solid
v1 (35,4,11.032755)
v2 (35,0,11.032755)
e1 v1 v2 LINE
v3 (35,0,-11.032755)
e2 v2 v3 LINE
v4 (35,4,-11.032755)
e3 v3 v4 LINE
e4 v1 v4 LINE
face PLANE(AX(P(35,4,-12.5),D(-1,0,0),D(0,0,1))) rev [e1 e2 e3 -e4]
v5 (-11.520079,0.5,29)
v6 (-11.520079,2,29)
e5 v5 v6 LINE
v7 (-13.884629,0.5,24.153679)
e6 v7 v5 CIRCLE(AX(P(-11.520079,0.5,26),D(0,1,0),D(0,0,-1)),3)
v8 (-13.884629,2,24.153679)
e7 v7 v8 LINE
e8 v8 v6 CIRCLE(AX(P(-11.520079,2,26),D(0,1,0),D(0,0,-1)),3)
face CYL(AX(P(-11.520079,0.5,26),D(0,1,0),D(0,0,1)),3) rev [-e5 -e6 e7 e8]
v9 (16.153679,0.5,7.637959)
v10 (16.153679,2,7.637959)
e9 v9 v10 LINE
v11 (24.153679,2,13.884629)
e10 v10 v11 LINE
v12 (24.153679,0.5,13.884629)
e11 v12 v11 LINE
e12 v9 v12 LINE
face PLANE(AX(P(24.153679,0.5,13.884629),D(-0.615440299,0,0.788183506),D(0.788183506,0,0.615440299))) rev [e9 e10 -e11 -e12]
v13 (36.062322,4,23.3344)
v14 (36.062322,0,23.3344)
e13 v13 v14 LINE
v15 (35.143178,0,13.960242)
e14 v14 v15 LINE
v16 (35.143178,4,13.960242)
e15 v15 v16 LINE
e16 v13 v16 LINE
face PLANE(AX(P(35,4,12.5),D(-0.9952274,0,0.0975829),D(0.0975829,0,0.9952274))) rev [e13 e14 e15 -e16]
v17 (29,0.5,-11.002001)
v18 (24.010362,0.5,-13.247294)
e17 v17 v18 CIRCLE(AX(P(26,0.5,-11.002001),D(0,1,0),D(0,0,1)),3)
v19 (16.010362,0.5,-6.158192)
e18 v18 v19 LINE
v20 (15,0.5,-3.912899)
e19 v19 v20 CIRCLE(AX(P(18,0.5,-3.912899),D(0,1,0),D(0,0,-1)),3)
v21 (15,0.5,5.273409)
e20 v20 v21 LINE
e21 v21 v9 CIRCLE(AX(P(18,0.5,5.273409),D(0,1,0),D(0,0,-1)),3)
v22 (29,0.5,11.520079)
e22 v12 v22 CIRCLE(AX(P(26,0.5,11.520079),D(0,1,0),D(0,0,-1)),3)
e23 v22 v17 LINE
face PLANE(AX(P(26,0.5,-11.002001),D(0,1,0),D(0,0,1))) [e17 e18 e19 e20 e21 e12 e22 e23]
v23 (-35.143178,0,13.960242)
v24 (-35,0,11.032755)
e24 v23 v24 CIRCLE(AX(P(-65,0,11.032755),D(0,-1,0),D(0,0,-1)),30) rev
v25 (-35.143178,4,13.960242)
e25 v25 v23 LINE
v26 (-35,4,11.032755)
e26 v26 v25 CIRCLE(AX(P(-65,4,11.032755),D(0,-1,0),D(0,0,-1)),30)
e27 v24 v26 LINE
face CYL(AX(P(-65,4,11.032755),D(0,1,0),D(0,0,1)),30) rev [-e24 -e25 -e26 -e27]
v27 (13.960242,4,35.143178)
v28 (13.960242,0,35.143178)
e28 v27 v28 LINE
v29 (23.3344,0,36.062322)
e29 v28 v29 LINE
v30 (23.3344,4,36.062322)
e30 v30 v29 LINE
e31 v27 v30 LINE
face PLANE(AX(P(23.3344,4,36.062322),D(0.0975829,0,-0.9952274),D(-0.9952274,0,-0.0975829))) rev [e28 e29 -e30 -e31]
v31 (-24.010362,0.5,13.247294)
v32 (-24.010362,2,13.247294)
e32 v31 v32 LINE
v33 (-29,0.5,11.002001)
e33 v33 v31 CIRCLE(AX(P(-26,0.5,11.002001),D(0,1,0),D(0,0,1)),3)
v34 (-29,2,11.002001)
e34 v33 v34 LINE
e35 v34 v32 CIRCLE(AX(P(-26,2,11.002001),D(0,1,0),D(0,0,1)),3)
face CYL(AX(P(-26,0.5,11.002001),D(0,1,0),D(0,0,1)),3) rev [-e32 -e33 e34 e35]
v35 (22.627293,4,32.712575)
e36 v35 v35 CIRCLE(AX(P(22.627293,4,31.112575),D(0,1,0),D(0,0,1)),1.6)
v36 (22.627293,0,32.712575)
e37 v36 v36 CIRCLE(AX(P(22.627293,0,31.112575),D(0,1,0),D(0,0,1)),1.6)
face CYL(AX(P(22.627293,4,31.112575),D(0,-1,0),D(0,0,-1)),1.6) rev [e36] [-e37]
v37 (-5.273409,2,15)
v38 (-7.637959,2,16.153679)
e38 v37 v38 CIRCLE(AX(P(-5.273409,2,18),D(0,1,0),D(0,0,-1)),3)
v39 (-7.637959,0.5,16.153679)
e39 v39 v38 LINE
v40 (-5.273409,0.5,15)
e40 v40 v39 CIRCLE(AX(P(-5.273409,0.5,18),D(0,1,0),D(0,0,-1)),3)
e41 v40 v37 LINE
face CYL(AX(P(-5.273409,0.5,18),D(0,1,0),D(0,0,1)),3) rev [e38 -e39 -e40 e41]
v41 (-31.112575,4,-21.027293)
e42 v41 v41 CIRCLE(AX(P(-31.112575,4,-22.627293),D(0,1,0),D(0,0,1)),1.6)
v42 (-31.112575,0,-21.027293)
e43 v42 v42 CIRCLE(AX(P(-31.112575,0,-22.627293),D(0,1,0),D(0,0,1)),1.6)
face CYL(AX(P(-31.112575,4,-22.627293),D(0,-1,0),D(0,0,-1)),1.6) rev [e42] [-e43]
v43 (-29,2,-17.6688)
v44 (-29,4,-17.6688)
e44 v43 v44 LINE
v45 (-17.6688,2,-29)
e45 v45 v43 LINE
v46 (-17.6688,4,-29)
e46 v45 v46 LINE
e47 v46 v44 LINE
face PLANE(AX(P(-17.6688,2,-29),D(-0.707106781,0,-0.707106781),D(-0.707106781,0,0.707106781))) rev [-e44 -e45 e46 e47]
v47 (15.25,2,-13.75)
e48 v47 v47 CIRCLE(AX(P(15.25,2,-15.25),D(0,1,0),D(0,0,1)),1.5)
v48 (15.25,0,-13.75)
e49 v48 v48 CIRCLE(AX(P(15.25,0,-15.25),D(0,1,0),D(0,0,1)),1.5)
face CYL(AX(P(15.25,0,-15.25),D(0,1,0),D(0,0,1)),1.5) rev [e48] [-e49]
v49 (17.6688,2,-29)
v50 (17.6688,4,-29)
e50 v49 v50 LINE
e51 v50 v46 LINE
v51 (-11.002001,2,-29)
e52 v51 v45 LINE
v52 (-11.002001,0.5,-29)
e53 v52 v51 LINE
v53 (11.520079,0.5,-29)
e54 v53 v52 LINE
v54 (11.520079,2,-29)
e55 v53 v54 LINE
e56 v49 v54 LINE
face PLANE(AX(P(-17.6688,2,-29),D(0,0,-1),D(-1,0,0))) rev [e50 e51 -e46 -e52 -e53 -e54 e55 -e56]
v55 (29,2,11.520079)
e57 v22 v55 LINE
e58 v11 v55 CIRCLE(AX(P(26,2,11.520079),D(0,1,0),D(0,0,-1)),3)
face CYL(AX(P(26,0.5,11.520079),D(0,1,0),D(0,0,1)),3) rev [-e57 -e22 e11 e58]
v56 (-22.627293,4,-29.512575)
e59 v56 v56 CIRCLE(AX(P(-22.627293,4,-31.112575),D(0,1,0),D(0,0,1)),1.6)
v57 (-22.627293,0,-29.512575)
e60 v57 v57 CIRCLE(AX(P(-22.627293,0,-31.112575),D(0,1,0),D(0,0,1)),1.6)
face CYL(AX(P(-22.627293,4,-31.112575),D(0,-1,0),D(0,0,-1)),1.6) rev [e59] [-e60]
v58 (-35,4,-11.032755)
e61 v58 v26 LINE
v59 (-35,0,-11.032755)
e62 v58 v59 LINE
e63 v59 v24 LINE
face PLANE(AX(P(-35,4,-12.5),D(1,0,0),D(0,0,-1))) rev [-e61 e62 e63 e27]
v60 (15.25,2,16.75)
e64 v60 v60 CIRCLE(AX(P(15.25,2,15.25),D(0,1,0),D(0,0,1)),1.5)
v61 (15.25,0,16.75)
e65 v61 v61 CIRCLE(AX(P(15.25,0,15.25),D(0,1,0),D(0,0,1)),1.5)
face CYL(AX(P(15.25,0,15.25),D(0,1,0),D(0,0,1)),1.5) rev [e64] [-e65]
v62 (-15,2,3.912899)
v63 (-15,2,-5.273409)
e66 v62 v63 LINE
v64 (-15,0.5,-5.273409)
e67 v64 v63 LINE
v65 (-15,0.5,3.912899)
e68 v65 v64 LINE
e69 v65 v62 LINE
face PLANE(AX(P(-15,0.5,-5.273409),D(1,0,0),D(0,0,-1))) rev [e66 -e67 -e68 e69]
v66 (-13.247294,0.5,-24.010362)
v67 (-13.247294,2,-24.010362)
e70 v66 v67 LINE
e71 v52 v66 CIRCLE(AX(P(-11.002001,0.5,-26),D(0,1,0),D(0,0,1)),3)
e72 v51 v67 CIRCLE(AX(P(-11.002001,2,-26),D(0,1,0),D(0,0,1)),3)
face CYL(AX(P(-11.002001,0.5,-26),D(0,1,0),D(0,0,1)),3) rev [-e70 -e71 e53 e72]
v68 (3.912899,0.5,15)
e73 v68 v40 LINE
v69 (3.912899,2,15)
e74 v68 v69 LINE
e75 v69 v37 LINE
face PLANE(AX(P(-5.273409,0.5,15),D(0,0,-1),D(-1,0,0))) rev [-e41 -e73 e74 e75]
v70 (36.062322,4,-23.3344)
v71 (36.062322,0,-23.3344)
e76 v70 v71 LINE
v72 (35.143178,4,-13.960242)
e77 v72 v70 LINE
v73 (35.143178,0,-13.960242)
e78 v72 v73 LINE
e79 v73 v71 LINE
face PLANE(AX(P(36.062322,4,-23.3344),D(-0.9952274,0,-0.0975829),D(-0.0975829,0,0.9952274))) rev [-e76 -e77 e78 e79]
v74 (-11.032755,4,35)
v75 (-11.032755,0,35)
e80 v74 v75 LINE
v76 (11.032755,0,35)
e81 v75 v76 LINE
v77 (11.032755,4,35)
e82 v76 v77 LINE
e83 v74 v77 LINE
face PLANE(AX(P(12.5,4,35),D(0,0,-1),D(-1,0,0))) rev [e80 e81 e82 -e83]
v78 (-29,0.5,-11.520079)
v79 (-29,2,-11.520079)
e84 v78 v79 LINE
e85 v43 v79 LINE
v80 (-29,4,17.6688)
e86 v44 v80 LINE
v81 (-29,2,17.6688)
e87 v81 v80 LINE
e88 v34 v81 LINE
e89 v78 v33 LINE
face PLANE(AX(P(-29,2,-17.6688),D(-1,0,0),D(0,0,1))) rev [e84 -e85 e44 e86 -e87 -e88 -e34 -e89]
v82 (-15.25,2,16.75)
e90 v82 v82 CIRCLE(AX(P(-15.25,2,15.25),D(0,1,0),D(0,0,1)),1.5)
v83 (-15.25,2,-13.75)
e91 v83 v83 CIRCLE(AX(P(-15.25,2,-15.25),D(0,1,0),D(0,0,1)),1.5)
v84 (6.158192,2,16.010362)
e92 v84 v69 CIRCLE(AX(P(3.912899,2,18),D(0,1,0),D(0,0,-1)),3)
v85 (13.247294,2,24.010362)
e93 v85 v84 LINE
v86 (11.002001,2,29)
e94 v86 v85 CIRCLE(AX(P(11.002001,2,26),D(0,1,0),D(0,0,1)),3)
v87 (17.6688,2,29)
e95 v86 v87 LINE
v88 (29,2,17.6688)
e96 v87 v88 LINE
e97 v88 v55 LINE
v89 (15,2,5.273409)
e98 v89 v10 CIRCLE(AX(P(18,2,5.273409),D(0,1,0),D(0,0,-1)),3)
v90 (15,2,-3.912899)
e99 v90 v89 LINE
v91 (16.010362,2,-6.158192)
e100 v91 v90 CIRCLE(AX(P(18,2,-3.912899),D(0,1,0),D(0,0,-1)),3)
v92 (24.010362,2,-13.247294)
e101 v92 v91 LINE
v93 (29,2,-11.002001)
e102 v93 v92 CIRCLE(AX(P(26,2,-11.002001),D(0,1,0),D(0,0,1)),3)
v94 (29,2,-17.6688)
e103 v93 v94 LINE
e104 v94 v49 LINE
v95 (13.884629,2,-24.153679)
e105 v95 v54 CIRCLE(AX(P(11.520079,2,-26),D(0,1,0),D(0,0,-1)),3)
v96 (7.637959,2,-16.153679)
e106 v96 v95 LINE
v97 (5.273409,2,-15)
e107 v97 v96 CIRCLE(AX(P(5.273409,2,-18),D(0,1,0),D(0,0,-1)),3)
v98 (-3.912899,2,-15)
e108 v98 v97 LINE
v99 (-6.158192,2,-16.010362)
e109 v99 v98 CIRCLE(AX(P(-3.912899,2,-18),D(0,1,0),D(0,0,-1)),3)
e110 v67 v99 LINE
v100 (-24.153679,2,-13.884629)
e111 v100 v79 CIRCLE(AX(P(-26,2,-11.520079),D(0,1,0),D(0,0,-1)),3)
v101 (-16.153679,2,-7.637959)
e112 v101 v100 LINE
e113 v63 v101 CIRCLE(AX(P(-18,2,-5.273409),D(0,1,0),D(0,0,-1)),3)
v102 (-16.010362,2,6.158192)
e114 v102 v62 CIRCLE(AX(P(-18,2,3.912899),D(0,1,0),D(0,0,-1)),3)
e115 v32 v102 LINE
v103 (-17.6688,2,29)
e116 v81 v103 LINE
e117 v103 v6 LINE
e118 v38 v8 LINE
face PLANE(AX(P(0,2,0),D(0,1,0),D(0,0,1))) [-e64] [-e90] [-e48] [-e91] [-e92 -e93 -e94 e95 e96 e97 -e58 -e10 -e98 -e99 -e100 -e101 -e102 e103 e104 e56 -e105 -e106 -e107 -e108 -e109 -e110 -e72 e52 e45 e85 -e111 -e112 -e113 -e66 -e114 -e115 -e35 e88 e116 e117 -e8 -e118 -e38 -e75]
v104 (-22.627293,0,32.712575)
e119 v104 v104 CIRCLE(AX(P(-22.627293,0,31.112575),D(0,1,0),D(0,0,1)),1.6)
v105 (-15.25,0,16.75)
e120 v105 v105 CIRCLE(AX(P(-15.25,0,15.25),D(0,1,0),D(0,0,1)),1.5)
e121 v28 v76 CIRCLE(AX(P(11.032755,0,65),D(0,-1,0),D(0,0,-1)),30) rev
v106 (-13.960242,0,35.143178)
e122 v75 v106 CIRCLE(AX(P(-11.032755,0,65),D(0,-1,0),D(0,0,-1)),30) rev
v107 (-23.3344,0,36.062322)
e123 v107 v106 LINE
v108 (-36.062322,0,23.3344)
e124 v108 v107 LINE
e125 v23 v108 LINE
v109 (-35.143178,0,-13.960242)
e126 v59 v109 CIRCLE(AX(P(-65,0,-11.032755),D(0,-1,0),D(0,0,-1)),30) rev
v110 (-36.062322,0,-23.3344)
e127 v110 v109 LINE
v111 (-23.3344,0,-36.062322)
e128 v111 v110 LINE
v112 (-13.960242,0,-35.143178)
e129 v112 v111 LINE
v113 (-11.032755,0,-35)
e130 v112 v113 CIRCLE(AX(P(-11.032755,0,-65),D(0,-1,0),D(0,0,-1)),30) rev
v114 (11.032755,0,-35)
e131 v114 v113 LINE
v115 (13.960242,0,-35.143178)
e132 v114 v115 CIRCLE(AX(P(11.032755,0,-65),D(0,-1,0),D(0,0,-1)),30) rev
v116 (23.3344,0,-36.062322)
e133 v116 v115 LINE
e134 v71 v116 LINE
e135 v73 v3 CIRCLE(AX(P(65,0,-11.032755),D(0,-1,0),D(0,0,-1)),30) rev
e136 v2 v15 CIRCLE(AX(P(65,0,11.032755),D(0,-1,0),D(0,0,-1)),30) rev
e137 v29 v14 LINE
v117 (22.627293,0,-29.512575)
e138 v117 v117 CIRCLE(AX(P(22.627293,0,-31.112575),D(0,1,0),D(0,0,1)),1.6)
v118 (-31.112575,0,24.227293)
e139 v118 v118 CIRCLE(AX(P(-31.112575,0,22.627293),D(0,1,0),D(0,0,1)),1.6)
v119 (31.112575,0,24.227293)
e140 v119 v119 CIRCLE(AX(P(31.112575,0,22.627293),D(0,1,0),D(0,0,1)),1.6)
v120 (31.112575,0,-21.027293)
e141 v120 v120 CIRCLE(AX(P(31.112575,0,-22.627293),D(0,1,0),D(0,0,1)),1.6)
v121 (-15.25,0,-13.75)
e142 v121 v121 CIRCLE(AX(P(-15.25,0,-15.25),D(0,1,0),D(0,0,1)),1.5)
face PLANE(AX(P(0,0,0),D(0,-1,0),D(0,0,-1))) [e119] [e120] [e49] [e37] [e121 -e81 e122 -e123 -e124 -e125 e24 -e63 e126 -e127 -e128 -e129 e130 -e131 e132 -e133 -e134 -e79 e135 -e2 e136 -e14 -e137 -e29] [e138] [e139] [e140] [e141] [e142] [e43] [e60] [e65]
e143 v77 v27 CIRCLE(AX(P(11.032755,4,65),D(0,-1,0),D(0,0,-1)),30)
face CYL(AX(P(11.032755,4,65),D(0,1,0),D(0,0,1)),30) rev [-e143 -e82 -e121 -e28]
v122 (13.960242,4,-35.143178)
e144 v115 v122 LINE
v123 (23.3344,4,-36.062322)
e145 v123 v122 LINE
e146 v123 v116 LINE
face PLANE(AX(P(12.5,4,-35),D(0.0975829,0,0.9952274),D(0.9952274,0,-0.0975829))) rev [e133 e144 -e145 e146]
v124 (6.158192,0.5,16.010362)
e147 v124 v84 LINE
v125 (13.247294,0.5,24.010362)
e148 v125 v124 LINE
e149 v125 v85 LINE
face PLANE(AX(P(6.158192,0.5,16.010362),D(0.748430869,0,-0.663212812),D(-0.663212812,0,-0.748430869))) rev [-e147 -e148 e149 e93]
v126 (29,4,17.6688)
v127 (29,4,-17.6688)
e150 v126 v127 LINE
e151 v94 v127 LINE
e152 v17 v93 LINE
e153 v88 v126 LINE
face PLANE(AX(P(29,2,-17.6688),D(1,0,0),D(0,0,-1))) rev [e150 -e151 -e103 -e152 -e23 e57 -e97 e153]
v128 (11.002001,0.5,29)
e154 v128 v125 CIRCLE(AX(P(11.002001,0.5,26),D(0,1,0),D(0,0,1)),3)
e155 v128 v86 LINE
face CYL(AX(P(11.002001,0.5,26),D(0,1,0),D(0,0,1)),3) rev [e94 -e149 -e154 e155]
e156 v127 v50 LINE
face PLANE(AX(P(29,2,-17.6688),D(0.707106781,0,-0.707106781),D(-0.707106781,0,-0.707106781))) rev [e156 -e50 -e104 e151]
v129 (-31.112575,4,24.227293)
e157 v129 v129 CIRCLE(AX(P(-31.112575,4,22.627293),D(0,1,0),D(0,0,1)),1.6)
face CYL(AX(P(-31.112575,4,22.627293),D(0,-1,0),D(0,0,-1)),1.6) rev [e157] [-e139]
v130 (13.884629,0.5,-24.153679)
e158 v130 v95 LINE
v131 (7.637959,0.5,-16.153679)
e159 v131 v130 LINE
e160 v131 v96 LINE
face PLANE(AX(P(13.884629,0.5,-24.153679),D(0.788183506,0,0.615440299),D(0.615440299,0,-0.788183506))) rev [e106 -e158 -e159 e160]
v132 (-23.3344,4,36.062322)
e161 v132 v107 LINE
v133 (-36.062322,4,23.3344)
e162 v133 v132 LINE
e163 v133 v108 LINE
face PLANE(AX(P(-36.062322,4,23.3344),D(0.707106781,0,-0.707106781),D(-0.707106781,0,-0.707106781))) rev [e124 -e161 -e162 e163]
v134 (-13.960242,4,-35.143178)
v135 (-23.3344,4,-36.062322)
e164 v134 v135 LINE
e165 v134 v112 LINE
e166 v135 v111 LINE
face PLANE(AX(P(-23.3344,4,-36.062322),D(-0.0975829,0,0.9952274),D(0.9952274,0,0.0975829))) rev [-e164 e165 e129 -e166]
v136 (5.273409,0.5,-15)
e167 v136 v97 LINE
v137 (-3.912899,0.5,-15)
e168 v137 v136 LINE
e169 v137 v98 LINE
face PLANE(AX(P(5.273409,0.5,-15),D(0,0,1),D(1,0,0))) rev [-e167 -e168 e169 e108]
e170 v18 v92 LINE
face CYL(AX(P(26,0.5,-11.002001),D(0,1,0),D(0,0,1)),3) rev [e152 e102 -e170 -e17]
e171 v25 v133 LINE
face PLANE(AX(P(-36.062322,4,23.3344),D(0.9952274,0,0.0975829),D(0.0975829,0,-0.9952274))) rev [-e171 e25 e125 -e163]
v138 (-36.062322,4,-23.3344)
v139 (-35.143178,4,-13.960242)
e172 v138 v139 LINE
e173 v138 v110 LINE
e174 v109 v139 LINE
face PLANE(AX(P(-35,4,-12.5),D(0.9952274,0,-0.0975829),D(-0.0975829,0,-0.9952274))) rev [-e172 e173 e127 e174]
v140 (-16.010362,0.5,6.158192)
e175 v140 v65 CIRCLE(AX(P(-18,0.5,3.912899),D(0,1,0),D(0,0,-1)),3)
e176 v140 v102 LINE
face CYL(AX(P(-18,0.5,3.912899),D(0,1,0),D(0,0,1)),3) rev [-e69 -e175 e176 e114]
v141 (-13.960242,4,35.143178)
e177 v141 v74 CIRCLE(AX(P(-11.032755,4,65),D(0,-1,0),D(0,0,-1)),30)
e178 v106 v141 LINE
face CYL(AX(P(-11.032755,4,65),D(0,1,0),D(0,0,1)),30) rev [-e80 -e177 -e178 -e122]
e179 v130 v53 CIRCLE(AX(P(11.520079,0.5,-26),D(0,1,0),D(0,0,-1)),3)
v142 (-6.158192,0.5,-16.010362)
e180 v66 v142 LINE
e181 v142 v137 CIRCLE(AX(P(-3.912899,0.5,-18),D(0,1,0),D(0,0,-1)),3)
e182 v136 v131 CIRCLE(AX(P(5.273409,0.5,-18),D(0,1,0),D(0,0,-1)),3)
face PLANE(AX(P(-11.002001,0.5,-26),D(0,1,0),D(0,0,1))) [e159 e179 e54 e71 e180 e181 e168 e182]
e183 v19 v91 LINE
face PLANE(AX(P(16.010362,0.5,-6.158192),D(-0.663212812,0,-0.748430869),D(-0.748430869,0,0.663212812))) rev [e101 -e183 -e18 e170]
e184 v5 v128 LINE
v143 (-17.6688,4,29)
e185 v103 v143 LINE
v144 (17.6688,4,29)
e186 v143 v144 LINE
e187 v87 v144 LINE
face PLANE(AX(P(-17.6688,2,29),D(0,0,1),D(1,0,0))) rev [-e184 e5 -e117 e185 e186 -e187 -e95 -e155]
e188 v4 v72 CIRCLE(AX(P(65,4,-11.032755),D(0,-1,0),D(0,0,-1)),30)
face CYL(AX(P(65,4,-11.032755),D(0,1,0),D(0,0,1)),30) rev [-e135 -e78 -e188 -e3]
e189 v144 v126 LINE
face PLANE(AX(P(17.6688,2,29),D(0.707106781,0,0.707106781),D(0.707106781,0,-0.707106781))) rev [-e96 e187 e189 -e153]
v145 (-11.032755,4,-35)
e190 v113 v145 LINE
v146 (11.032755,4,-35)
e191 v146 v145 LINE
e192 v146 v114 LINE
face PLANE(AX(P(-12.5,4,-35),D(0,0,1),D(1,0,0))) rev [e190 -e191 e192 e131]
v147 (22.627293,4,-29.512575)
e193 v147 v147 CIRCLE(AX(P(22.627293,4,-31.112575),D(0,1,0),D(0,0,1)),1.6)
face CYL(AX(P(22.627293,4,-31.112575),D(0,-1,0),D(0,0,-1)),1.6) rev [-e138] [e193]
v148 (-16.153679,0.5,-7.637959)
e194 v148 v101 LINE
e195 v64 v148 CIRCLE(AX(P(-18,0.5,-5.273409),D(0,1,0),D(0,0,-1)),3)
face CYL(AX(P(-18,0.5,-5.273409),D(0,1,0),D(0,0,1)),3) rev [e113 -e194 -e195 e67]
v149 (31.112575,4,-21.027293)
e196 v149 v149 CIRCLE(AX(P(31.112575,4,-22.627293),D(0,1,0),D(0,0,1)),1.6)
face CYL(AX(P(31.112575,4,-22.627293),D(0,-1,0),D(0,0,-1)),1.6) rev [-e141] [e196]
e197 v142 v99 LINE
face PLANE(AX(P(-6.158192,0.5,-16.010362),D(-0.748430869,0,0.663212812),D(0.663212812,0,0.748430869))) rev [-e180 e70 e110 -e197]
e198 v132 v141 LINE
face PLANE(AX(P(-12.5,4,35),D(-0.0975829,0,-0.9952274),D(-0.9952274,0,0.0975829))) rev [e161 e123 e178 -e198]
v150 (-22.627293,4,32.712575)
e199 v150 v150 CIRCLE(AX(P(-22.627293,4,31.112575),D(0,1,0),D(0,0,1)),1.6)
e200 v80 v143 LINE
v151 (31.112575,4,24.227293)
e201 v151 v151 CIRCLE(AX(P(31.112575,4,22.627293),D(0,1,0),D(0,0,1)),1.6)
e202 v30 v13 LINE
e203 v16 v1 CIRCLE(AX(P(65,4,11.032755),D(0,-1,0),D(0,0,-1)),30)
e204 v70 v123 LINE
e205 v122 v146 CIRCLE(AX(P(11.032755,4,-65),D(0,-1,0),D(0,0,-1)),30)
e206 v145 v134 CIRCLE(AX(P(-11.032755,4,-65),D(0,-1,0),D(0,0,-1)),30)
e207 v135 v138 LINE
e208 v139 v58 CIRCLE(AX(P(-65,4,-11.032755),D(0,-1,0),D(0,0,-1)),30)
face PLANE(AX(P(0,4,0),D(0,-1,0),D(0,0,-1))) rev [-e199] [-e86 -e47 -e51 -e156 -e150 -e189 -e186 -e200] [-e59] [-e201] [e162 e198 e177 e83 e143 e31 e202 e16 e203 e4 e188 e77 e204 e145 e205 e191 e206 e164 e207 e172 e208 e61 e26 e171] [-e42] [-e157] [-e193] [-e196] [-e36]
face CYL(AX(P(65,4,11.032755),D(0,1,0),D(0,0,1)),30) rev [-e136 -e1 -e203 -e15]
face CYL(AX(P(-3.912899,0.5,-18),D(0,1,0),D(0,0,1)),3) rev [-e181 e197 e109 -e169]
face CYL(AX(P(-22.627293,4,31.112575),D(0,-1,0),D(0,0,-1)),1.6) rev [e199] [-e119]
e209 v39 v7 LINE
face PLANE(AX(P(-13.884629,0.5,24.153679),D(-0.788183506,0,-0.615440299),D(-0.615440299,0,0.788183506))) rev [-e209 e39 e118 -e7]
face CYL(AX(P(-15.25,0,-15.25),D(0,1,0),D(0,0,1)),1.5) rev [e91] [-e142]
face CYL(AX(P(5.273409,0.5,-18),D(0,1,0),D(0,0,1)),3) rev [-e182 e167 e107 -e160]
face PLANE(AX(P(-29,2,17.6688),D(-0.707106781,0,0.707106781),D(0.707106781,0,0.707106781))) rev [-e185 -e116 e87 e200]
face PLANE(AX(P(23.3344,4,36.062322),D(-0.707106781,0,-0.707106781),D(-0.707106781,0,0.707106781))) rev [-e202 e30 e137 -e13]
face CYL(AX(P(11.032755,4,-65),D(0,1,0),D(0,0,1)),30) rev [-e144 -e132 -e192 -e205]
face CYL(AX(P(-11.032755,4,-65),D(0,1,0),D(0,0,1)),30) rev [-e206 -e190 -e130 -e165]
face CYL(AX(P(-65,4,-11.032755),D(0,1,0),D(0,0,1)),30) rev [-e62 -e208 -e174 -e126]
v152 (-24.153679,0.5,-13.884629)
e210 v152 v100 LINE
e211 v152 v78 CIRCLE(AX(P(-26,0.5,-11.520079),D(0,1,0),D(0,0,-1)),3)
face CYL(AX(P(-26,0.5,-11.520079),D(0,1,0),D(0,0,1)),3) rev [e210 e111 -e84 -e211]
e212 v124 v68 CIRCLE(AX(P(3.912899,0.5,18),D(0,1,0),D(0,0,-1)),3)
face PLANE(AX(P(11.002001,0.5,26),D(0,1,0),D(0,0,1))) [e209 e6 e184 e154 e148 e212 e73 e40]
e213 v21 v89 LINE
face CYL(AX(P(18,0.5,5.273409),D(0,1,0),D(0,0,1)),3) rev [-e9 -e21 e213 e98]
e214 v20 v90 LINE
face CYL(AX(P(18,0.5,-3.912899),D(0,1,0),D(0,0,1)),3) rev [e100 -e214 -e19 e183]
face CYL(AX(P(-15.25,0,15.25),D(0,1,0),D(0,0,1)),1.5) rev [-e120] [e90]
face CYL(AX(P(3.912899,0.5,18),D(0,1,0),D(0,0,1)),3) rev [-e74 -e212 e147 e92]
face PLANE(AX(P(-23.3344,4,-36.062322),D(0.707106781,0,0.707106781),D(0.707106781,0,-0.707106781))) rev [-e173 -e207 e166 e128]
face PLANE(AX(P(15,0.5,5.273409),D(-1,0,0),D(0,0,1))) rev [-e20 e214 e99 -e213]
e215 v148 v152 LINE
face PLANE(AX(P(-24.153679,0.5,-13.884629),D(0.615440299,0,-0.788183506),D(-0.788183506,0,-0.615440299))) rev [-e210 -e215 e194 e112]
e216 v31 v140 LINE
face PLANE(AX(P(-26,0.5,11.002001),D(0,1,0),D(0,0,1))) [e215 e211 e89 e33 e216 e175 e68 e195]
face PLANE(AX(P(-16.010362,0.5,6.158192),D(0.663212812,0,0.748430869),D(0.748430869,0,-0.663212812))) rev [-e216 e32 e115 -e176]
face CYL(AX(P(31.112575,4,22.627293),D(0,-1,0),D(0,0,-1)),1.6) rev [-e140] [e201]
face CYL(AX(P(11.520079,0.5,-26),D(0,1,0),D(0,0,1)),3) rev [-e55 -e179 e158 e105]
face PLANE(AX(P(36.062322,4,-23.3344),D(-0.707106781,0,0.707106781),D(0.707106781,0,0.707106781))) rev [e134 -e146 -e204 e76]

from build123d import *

# Parameters (mm, degrees)
SKETCH1_R           = 1.6
BOSS_EXTRUDE1_DEPTH = 4
CUT_EXTRUDE1_DEPTH  = 2
CUT_EXTRUDE2_DEPTH  = 1.5
SKETCH5_R           = 1.5
CUT_EXTRUDE3_DEPTH  = 52.039025935
FILLET1_R           = 30


with BuildPart() as part:
    # Sketch1 → Boss-Extrude1 (new body)
    with BuildSketch(Plane(origin=(0, 0, 0), x_dir=(1, 0, 0), z_dir=(0, 1, 0))):
        Polygon((-35, 12.5), (-36.062322224, 23.334400163), (-23.334400163, 36.062322224), (-12.5, 35), (12.5, 35), (23.334400163, 36.062322224), (36.062322224, 23.334400163), (35, 12.5), (35, -12.5), (36.062322224, -23.334400163), (23.334400163, -36.062322224), (12.5, -35), (-12.5, -35), (-23.334400163, -36.062322224), (-36.062322224, -23.334400163), (-35, -12.5), align=None)
        with Locations(Location((31.112574756, 22.627293382, 0), (0, 0, 270))):
            Circle(SKETCH1_R, mode=Mode.SUBTRACT)
        with Locations(Location((22.627293382, 31.112574756, 0), (0, 0, 270))):
            Circle(SKETCH1_R, mode=Mode.SUBTRACT)
        with Locations(Location((31.112574756, -22.627293382, 0), (0, 0, 270))):
            Circle(SKETCH1_R, mode=Mode.SUBTRACT)
        with Locations(Location((22.627293382, -31.112574756, 0), (0, 0, 270))):
            Circle(SKETCH1_R, mode=Mode.SUBTRACT)
        with Locations(Location((-22.627293382, -31.112574756, 0), (0, 0, 270))):
            Circle(SKETCH1_R, mode=Mode.SUBTRACT)
        with Locations(Location((-31.112574756, -22.627293382, 0), (0, 0, 270))):
            Circle(SKETCH1_R, mode=Mode.SUBTRACT)
        with Locations(Location((-31.112574756, 22.627293382, 0), (0, 0, 270))):
            Circle(SKETCH1_R, mode=Mode.SUBTRACT)
        with Locations(Location((-22.627293382, 31.112574756, 0), (0, 0, 270))):
            Circle(SKETCH1_R, mode=Mode.SUBTRACT)
    extrude(amount=BOSS_EXTRUDE1_DEPTH)

    # Sketch3 → Cut-Extrude1 (cut)
    with BuildSketch(Plane(origin=(0, 4, 0), x_dir=(1, 0, 0), z_dir=(0, 1, 0))):
        Polygon((-17.668800325, 29), (17.668800325, 29), (29, 17.668800325), (29, -17.668800325), (17.668800325, -29), (-17.668800325, -29), (-29, -17.668800325), (-29, 17.668800325), align=None)
    extrude(amount=-CUT_EXTRUDE1_DEPTH, mode=Mode.SUBTRACT)

    # Sketch4 → Cut-Extrude2 (cut)
    with BuildSketch(Plane(origin=(0, 2, 0), x_dir=(1, 0, 0), z_dir=(0, 1, 0))):
        with BuildLine():
            Line((-29, -11.00200097), (-29, 11.520078787))
            ThreePointArc((-29, 11.520078787), (-27.315491792, 14.216276359), (-24.153679103, 13.884629304))
            Line((-24.153679103, 13.884629304), (-16.153679103, 7.637959136))
            ThreePointArc((-16.153679103, 7.637959136), (-15.303802428, 6.588900412), (-15, 5.273408619))
            Line((-15, 5.273408619), (-15, -3.912899337))
            ThreePointArc((-15, -3.912899337), (-15.264226315, -5.143972993), (-16.010361564, -6.158191945))
            Line((-16.010361564, -6.158191945), (-24.010361564, -13.247293577))
            ThreePointArc((-24.010361564, -13.247293577), (-27.231073656, -13.737774655), (-29, -11.00200097))
        make_face()
        with BuildLine():
            Line((13.884629304, 24.153679103), (7.637959136, 16.153679103))
            ThreePointArc((7.637959136, 16.153679103), (6.588900412, 15.303802428), (5.273408619, 15))
            Line((5.273408619, 15), (-3.912899337, 15))
            ThreePointArc((-3.912899337, 15), (-5.143972993, 15.264226315), (-6.158191945, 16.010361564))
            Line((-6.158191945, 16.010361564), (-13.247293578, 24.010361564))
            ThreePointArc((-13.247293578, 24.010361564), (-13.737774655, 27.231073656), (-11.00200097, 29))
            Line((-11.00200097, 29), (11.520078787, 29))
            ThreePointArc((11.520078787, 29), (14.216276359, 27.315491792), (13.884629304, 24.153679103))
        make_face()
        with BuildLine():
            Line((24.153679103, -13.884629304), (16.153679103, -7.637959136))
            ThreePointArc((16.153679103, -7.637959136), (15.303802428, -6.588900412), (15, -5.273408619))
            Line((15, -5.273408619), (15, 3.912899337))
            ThreePointArc((15, 3.912899337), (15.264226315, 5.143972993), (16.010361564, 6.158191945))
            Line((16.010361564, 6.158191945), (24.010361564, 13.247293578))
            ThreePointArc((24.010361564, 13.247293578), (27.231073656, 13.737774655), (29, 11.00200097))
            Line((29, 11.00200097), (29, -11.520078787))
            ThreePointArc((29, -11.520078787), (27.315491792, -14.216276359), (24.153679103, -13.884629304))
        make_face()
        with BuildLine():
            Line((-13.884629304, -24.153679103), (-7.637959136, -16.153679103))
            ThreePointArc((-7.637959136, -16.153679103), (-6.588900412, -15.303802428), (-5.273408619, -15))
            Line((-5.273408619, -15), (3.912899337, -15))
            ThreePointArc((3.912899337, -15), (5.143972993, -15.264226315), (6.158191945, -16.010361564))
            Line((6.158191945, -16.010361564), (13.247293578, -24.010361564))
            ThreePointArc((13.247293578, -24.010361564), (13.737774655, -27.231073656), (11.00200097, -29))
            Line((11.00200097, -29), (-11.520078787, -29))
            ThreePointArc((-11.520078787, -29), (-14.216276359, -27.315491792), (-13.884629304, -24.153679103))
        make_face()
    extrude(amount=-CUT_EXTRUDE2_DEPTH, mode=Mode.SUBTRACT)

    # Sketch5 → Cut-Extrude3 (cut, through all)
    with BuildSketch(Plane(origin=(0, 2, 0), x_dir=(1, 0, 0), z_dir=(0, 1, 0))):
        with Locations(Location((15.25, 15.25, 0), (0, 0, 270))):
            Circle(SKETCH5_R)
        with Locations(Location((15.25, -15.25, 0), (0, 0, 270))):
            Circle(SKETCH5_R)
        with Locations(Location((-15.25, -15.25, 0), (0, 0, 270))):
            Circle(SKETCH5_R)
        with Locations(Location((-15.25, 15.25, 0), (0, 0, 270))):
            Circle(SKETCH5_R)
    extrude(amount=-CUT_EXTRUDE3_DEPTH, mode=Mode.SUBTRACT)

    # Fillet1
    # the kernel refuses this fillet: 30 mm, written as the material it adds along each edge
    with BuildSketch(Plane(origin=(-35, 0, -12.5), x_dir=(-0.09758289975914561, 0, -0.9952273999818315), z_dir=(0, 1, 0)), Plane(origin=(12.5, 0, 35), x_dir=(-1, 0, 0), z_dir=(0, 1, 0)), Plane(origin=(-12.5, 0, 35), x_dir=(-0.9952273999818316, 0, 0.09758289975914514), z_dir=(0, 1, 0)), Plane(origin=(-35, 0, 12.5), x_dir=(0, 0, -1), z_dir=(0, 1, 0))) as fillet1_piece_1:
        with BuildLine():
            CenterArc((FILLET1_R * 0.0489081594208, FILLET1_R), FILLET1_R, 264.4, 5.6)
            Line((-FILLET1_R * 0.0486747403383, FILLET1_R * 0.00477260001817), (0, 0))
            Line((0, 0), (FILLET1_R * 0.0489081594208, 0))
        make_face()
    extrude(amount=4)
    with BuildSketch(Plane(origin=(-12.5, 0, -35), x_dir=(-0.9952273999818313, 0, -0.09758289975914779), z_dir=(0, 1, 0)), Plane(origin=(12.5, 0, -35), x_dir=(-1, 0, 0), z_dir=(0, 1, 0)), Plane(origin=(35, 0, -12.5), x_dir=(0.0975828997591479, 0, -0.9952273999818313), z_dir=(0, 1, 0)), Plane(origin=(35, 0, 12.5), x_dir=(0, 0, -1), z_dir=(0, 1, 0))) as fillet1_piece_2:
        with BuildLine():
            CenterArc((FILLET1_R * 0.0489081594208, -FILLET1_R), FILLET1_R, 90, 5.6)
            Line((-FILLET1_R * 0.0486747403383, -FILLET1_R * 0.00477260001817), (0, 0))
            Line((0, 0), (FILLET1_R * 0.0489081594208, 0))
        make_face()
    extrude(amount=4)


solid = part.part
